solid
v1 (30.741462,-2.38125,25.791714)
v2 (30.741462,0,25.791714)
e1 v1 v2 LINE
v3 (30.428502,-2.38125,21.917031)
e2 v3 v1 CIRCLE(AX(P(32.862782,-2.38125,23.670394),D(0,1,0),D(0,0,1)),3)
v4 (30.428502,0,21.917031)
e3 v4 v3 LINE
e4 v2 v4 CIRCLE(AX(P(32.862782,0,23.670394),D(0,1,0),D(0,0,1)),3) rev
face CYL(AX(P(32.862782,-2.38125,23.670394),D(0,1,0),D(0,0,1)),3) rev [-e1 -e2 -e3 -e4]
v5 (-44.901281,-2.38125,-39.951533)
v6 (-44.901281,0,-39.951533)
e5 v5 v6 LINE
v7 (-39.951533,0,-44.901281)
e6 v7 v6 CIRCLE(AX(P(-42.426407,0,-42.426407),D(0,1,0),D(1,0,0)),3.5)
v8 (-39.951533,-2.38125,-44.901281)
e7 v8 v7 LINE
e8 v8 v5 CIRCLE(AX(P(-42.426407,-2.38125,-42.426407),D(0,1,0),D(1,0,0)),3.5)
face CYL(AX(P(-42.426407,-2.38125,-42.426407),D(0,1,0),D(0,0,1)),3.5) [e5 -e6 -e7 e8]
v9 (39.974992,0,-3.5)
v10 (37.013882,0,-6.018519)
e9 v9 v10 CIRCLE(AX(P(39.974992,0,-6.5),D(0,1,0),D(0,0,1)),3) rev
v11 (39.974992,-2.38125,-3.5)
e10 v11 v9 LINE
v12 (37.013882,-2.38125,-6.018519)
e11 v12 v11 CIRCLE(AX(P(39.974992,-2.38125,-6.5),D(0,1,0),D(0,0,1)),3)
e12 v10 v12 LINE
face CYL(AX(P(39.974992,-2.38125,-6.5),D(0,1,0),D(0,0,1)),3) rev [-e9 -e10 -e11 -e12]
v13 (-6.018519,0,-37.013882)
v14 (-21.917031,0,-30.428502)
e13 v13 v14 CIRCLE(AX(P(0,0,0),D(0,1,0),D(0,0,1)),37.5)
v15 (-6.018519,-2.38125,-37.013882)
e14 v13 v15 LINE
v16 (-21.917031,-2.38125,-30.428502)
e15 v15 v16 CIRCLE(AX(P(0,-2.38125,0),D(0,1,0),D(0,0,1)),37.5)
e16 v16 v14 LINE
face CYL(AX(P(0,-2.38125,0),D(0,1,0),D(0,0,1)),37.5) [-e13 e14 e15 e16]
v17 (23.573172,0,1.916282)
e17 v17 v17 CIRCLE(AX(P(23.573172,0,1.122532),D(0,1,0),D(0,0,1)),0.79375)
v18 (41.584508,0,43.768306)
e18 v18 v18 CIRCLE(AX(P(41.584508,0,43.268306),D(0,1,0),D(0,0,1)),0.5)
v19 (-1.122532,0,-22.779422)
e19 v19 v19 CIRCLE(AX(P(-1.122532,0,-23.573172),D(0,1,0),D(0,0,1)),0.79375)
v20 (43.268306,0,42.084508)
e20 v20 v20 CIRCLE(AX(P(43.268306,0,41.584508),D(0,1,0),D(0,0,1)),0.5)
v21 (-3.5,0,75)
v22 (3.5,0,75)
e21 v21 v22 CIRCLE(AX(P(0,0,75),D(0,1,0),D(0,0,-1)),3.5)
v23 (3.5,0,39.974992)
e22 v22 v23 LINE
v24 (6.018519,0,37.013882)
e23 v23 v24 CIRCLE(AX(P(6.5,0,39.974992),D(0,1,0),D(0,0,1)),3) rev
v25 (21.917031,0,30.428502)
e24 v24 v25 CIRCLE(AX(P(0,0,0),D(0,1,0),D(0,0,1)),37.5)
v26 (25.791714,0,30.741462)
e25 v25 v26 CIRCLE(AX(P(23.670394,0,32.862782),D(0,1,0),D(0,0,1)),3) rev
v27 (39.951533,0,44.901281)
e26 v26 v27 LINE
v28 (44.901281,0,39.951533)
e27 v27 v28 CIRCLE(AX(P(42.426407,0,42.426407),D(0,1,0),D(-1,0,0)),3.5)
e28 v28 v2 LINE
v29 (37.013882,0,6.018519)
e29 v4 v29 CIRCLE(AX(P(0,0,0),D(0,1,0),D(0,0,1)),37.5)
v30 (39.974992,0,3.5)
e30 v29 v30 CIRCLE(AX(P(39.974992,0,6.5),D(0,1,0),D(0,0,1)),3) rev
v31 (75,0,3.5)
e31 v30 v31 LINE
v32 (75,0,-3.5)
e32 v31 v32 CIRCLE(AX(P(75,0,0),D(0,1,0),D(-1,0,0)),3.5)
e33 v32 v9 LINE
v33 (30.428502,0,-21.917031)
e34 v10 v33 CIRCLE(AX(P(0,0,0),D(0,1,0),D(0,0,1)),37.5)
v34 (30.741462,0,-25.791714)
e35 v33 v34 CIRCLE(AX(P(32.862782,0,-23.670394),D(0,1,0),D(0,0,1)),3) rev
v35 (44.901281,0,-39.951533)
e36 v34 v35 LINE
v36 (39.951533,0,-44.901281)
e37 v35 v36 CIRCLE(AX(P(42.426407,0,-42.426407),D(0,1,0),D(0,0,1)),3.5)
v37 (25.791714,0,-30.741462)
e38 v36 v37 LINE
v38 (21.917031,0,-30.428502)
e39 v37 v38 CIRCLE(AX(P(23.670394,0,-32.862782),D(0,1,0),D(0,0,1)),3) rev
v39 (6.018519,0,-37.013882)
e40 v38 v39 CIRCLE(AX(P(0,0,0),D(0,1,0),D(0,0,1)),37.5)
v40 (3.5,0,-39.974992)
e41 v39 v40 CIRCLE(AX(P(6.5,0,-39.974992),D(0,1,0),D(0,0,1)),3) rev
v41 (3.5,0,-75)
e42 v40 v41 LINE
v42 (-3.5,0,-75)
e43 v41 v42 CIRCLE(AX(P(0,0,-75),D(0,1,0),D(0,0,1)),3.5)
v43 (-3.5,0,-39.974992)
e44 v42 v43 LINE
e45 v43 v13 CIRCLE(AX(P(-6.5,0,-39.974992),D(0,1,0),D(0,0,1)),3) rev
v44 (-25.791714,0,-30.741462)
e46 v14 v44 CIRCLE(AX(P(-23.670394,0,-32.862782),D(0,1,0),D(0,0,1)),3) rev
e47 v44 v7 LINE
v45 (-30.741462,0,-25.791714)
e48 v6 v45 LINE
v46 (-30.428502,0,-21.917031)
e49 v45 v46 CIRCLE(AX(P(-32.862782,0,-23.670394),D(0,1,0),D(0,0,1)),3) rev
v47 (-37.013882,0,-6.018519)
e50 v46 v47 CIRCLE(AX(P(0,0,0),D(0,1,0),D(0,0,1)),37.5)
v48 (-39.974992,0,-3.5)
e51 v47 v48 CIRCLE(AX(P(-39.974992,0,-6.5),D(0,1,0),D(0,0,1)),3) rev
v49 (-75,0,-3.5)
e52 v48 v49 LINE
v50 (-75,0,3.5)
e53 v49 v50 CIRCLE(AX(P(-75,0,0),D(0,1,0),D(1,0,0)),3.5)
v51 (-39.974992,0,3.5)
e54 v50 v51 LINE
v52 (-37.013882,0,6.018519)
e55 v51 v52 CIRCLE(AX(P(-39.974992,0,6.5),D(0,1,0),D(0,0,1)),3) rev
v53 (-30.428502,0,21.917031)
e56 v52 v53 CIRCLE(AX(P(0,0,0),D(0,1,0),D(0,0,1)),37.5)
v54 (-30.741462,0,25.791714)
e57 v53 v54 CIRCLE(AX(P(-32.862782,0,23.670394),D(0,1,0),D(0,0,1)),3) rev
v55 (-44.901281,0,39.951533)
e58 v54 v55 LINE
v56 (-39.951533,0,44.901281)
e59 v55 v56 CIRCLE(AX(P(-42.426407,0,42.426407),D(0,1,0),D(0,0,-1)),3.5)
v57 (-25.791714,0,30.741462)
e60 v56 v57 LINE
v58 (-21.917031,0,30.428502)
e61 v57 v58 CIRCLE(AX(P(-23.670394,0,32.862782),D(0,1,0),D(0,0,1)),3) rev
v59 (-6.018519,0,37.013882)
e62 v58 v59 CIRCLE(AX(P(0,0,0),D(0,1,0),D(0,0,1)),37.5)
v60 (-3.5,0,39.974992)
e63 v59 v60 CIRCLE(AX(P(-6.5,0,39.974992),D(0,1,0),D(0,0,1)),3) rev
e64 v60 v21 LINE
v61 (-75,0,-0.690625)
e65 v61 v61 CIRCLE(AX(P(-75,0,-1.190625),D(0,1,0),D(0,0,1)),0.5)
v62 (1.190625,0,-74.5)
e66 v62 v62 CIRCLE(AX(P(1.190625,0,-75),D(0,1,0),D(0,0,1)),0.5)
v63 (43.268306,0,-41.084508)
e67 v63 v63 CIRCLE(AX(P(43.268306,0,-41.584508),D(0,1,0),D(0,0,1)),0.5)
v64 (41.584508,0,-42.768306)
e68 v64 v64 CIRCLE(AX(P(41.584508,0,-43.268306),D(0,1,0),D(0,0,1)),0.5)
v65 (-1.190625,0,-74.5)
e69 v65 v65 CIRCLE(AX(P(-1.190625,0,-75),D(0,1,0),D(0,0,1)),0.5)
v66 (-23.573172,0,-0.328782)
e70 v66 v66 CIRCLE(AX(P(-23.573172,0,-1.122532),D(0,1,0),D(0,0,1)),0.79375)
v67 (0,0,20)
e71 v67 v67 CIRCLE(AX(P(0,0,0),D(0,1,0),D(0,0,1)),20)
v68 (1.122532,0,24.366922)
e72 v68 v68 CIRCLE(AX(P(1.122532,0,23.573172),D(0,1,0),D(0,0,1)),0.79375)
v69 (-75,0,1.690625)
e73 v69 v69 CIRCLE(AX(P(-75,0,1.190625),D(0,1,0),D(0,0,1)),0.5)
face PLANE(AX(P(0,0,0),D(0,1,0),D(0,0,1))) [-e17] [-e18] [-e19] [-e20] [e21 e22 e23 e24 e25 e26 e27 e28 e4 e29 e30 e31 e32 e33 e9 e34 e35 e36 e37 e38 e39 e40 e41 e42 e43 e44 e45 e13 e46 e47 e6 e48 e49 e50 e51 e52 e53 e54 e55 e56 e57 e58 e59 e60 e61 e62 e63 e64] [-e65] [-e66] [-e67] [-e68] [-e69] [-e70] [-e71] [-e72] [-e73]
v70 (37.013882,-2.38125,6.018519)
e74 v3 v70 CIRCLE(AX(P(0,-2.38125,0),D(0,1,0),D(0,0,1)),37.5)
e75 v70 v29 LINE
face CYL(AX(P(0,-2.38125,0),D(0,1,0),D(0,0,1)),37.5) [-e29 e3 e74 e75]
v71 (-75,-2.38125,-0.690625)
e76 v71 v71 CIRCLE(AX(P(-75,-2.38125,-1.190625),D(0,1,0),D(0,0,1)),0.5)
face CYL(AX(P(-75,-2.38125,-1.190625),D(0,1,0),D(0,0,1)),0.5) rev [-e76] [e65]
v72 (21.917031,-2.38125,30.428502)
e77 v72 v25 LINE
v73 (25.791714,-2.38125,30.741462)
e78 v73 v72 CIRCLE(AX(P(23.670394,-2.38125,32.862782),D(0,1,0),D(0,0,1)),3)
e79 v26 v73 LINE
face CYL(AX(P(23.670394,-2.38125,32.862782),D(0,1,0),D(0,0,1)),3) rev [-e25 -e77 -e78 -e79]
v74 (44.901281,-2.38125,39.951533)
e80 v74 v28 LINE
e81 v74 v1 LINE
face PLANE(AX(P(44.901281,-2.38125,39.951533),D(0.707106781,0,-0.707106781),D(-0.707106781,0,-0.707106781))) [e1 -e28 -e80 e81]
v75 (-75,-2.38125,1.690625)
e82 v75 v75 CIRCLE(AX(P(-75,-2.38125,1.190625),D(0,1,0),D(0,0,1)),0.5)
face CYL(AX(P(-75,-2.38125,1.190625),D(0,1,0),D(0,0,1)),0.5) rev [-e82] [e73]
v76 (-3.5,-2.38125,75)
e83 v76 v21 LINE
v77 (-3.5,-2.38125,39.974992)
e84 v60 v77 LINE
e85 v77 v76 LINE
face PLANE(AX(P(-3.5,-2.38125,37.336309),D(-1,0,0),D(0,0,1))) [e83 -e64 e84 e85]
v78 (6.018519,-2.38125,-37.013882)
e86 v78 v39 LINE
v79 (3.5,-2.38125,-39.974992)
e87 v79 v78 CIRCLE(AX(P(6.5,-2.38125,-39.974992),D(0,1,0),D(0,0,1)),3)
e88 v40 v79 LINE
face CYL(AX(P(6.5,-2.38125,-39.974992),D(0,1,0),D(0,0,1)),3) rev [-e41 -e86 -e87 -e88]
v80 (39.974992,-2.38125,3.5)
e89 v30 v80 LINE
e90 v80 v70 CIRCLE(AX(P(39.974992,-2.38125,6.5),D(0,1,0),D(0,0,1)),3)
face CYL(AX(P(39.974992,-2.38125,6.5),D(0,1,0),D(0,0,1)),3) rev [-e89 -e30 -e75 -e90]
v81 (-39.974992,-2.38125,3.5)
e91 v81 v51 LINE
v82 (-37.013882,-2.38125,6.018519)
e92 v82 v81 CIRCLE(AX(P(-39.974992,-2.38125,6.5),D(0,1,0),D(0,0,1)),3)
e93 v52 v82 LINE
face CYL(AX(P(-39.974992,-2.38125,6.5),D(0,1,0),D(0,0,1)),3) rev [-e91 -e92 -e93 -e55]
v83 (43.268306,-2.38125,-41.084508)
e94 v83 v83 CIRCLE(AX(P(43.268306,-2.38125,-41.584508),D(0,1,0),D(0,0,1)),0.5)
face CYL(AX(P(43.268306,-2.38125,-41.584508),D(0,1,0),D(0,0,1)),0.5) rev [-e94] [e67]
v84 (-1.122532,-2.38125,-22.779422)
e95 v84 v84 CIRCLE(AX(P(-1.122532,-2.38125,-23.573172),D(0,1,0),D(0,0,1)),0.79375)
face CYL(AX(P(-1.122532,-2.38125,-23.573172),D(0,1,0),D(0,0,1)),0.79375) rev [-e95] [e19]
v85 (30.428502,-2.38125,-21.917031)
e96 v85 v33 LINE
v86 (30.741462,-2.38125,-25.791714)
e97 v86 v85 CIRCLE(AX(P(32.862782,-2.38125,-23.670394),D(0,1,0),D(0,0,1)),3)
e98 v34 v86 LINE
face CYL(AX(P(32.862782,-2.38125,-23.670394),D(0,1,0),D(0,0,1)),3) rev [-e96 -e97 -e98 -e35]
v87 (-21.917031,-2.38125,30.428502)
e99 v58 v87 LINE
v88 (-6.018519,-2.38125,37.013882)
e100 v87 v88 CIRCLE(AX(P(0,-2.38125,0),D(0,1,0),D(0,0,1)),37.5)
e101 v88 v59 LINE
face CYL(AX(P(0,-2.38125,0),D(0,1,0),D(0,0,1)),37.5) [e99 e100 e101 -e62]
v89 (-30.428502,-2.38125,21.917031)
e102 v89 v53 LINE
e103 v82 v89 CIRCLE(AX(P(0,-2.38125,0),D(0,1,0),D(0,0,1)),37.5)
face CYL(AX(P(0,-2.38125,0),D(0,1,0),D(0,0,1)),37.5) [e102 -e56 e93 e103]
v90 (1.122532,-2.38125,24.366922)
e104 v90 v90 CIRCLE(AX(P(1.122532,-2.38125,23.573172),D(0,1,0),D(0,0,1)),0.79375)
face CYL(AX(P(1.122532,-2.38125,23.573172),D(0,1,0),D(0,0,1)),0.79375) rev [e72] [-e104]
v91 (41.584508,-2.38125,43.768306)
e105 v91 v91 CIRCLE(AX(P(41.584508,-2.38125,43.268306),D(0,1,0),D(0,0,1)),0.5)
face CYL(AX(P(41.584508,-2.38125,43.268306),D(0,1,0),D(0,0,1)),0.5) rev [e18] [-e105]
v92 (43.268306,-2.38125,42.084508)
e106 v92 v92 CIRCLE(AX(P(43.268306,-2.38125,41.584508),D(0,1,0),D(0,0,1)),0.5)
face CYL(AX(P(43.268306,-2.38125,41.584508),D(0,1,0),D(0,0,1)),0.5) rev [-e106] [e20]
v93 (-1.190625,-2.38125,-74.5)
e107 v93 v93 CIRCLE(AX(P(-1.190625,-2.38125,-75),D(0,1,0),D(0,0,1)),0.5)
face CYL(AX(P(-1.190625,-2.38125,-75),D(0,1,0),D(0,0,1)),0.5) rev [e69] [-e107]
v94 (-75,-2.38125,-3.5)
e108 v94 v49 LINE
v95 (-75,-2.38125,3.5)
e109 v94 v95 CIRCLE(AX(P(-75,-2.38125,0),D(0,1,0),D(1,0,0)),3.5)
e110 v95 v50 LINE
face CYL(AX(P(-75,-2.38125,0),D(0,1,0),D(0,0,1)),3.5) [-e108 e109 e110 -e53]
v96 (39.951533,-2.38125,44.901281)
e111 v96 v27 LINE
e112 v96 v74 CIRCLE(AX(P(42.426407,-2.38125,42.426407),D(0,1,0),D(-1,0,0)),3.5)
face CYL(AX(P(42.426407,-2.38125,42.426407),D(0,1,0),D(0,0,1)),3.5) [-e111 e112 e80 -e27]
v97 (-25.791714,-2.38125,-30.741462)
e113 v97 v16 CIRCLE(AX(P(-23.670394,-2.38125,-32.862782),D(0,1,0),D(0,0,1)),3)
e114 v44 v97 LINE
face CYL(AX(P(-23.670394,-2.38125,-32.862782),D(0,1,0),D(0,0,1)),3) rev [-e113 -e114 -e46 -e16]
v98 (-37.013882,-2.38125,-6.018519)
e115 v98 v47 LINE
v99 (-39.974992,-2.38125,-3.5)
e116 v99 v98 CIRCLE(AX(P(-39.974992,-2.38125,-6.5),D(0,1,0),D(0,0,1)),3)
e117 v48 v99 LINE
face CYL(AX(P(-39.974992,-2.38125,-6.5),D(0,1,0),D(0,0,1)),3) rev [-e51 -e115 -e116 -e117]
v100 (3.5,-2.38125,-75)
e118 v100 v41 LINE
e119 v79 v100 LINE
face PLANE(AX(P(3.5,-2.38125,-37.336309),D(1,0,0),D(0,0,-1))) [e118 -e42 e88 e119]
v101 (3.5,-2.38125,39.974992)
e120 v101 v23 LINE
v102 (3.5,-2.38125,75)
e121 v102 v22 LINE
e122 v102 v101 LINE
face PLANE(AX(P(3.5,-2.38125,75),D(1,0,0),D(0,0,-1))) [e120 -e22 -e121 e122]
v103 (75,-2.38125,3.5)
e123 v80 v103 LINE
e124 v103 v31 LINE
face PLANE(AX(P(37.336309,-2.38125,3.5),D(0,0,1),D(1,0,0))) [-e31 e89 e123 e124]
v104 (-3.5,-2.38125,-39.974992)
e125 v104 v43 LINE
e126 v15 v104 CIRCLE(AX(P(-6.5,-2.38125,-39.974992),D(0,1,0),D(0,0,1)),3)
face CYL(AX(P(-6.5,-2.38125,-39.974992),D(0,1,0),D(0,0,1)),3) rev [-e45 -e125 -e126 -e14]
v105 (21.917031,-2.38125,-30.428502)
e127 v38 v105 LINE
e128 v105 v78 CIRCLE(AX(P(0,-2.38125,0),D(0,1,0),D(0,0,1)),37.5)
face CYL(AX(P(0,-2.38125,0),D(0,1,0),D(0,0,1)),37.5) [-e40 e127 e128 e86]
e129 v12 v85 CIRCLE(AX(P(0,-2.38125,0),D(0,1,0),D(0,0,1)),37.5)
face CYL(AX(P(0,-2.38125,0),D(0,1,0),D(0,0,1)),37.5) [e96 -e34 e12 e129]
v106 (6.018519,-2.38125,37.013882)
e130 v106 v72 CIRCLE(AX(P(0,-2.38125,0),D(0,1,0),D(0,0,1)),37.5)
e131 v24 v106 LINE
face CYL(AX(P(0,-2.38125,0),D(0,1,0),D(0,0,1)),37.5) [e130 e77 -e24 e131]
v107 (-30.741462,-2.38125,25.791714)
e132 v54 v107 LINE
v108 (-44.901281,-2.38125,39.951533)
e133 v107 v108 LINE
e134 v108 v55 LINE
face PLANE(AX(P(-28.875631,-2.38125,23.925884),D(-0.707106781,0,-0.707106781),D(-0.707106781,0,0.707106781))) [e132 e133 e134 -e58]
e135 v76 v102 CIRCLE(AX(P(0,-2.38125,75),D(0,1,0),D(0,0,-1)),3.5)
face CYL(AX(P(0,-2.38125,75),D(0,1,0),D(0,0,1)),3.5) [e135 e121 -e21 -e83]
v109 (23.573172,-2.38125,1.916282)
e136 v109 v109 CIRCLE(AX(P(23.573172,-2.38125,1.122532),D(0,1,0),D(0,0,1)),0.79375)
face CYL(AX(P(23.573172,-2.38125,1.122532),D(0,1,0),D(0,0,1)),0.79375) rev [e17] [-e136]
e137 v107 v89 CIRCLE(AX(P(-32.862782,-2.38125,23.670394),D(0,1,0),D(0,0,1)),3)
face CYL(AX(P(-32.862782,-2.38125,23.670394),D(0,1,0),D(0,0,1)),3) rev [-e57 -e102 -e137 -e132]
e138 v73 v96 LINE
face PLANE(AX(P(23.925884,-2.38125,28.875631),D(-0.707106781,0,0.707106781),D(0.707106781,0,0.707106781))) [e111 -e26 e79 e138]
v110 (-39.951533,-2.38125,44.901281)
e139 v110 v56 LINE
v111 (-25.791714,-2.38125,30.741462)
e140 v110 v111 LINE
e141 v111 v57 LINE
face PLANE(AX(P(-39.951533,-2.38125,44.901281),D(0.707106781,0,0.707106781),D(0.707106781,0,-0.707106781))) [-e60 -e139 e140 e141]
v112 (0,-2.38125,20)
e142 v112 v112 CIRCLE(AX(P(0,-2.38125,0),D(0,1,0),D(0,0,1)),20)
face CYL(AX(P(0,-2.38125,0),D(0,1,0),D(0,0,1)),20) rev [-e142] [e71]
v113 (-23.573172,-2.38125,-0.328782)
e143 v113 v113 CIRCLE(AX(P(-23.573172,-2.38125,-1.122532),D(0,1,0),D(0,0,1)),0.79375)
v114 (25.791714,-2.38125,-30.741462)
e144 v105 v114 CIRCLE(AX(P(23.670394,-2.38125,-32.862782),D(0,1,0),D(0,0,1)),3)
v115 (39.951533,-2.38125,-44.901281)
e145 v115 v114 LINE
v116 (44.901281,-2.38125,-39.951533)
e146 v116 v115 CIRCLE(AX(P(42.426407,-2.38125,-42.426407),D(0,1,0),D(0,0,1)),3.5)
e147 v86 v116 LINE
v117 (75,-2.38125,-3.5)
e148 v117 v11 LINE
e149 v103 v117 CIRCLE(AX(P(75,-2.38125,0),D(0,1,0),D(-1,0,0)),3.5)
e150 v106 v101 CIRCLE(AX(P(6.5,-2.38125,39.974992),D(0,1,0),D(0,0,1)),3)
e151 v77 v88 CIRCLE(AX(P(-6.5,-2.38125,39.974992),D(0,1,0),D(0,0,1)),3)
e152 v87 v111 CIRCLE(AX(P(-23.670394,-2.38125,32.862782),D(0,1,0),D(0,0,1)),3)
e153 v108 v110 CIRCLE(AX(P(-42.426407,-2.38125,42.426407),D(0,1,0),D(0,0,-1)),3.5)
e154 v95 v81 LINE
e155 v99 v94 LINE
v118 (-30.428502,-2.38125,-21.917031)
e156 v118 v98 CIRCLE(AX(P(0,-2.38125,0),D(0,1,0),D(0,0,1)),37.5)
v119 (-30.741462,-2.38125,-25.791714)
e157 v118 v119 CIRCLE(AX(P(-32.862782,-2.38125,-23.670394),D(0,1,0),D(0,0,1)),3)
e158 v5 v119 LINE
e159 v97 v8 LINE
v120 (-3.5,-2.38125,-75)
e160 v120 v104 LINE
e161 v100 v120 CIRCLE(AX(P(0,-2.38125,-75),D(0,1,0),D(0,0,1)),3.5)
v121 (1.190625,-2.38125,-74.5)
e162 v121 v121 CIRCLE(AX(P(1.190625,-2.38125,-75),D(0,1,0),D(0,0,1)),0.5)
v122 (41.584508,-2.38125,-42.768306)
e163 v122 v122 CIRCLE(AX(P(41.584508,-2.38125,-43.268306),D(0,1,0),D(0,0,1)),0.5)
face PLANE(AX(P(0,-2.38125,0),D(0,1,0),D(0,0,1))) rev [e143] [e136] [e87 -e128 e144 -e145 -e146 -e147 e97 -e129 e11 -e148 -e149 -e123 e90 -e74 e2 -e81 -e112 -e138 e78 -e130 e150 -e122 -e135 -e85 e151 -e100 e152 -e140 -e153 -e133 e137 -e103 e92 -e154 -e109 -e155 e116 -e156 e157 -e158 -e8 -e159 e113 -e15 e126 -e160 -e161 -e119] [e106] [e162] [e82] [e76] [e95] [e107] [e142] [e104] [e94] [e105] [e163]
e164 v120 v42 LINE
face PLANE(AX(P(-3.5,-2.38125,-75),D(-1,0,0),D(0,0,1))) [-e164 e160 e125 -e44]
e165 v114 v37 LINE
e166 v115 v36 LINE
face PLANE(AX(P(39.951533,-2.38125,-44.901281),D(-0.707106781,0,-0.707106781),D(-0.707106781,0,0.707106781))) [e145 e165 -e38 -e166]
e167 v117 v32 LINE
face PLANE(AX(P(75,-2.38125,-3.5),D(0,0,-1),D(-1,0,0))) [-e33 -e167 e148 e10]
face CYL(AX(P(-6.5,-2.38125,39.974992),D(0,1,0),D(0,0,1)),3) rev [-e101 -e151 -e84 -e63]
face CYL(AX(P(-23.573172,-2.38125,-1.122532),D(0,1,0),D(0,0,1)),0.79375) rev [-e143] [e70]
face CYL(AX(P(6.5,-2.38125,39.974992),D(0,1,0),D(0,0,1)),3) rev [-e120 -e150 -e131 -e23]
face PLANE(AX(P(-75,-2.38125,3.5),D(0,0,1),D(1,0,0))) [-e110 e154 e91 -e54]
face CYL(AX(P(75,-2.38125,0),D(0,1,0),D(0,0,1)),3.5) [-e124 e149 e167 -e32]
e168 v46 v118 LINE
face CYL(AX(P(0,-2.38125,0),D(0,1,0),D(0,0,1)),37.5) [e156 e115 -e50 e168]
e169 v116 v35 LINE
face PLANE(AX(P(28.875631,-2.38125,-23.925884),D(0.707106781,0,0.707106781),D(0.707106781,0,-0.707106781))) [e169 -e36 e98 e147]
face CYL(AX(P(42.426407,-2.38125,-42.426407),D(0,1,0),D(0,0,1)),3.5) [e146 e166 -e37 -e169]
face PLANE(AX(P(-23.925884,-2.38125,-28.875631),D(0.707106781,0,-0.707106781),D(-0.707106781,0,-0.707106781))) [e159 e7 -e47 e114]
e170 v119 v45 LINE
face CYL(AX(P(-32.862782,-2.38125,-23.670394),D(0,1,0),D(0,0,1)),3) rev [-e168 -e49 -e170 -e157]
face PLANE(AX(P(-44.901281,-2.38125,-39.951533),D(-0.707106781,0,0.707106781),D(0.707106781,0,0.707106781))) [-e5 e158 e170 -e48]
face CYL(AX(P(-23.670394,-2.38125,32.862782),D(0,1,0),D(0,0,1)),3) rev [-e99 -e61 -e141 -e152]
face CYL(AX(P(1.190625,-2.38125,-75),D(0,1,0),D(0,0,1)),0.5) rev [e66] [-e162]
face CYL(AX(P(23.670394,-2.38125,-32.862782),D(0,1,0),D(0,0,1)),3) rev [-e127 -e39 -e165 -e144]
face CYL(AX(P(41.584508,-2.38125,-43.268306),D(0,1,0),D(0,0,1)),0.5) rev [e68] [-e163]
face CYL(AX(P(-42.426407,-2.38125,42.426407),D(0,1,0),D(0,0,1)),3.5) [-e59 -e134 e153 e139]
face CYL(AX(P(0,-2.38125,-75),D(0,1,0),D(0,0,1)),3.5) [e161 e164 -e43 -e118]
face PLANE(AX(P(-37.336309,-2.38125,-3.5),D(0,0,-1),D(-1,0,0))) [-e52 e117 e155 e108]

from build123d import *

# Parameters (mm, degrees)
SKETCH1_R                = 37.5
SKETCH1_R_2              = 20
BASE_FLANGE1_DEPTH       = 2.38125
BOSS_EXTRUDE1_DEPTH      = 2.38125
BOSS_EXTRUDE2_DEPTH      = 2.38125
FILLET1_R                = 3
CIRPATTERN1_COUNT        = 4
FILLET1_OF_CIRPATTERN1_R = 3
SKETCH7_R                = 0.5
CUT_EXTRUDE1_DEPTH       = 112.041300207
SKETCH10_R               = 0.79375
CUT_EXTRUDE2_DEPTH       = 112.041300207


# Sheet-metal steps are written as plain solids
with BuildPart() as part:
    # Sketch1 → Base-Flange1 (new body)
    with BuildSketch(Plane(origin=(0, 0, 0), x_dir=(1, 0, 0), z_dir=(0, 1, 0))):
        with Locations(Location((0, 0, 0), (0, 0, 270))):
            Circle(SKETCH1_R)
        with Locations(Location((0, 0, 0), (0, 0, 270))):
            Circle(SKETCH1_R_2, mode=Mode.SUBTRACT)
    extrude(amount=-BASE_FLANGE1_DEPTH)

    # Sketch6 → Boss-Extrude1 (add)
    with BuildSketch(Plane(origin=(0, 0, 0), x_dir=(1, 0, 0), z_dir=(0, 1, 0))):
        with BuildLine():
            Line((-3.5, 75), (-3.5, 37.336309405))
            Line((-3.5, 37.336309405), (3.5, 37.336309405))
            Line((3.5, 37.336309405), (3.5, 75))
            ThreePointArc((3.5, 75), (0, 78.5), (-3.5, 75))
        make_face()
    boss_extrude1 = extrude(amount=-BOSS_EXTRUDE1_DEPTH)

    # Sketch9 → Boss-Extrude2 (add)
    with BuildSketch(Plane(origin=(0, 0, 0), x_dir=(1, 0, 0), z_dir=(0, 1, 0))):
        with BuildLine():
            Line((23.925883831, 28.875631299), (28.875631299, 23.925883831))
            Line((28.875631299, 23.925883831), (44.901280605, 39.951533137))
            ThreePointArc((44.901280605, 39.951533137), (44.901280605, 44.901280605), (39.951533137, 44.901280605))
            Line((39.951533137, 44.901280605), (23.925883831, 28.875631299))
        make_face()
    boss_extrude2 = extrude(amount=-BOSS_EXTRUDE2_DEPTH)

    # Fillet1
    fillet1_edges = [part.edges().sort_by_distance(p)[0] for p in [
        (3.5, -1.190625, -37.336309405),
        (-3.5, -1.190625, -37.336309405),
        (23.925883831, -1.190625, -28.875631299),
        (28.875631299, -1.190625, -23.925883831),
    ]]
    fillet(fillet1_edges, radius=FILLET1_R)

    # CirPattern1: Boss-Extrude1, Boss-Extrude2 ×4 about axis
    cirpattern1_axis = Axis((0, 0, 0), (0, 1, 0))
    add([boss_extrude1.rotate(cirpattern1_axis, i * 360 / CIRPATTERN1_COUNT) for i in range(1, CIRPATTERN1_COUNT)])
    add([boss_extrude2.rotate(cirpattern1_axis, i * 360 / CIRPATTERN1_COUNT) for i in range(1, CIRPATTERN1_COUNT)])

    # Fillet1 of CirPattern1
    fillet1_of_cirpattern1_edges = [part.edges().sort_by_distance(p)[0] for p in [
        (-37.336309405, -1.190625, -3.5),
        (-37.336309405, -1.190625, 3.5),
        (-28.875631299, -1.190625, -23.925883831),
        (-23.925883831, -1.190625, -28.875631299),
        (-3.5, -1.190625, 37.336309405),
        (3.5, -1.190625, 37.336309405),
        (-23.925883831, -1.190625, 28.875631299),
        (-28.875631299, -1.190625, 23.925883831),
        (37.336309405, -1.190625, 3.5),
        (37.336309405, -1.190625, -3.5),
        (28.875631299, -1.190625, 23.925883831),
        (23.925883831, -1.190625, 28.875631299),
    ]]
    fillet(fillet1_of_cirpattern1_edges, radius=FILLET1_OF_CIRPATTERN1_R)

    # Sketch7 → Cut-Extrude1 (cut, through all)
    with BuildSketch(Plane(origin=(0, 0, 0), x_dir=(1, 0, 0), z_dir=(0, 1, 0))):
        with Locations(Location((-1.190625, 75, 0), (0, 0, 270))):
            Circle(SKETCH7_R)
        with Locations(Location((1.190625, 75, 0), (0, 0, 270))):
            Circle(SKETCH7_R)
        with Locations(Location((41.58450786, 43.268305883, 0), (0, 0, 270))):
            Circle(SKETCH7_R)
        with Locations(Location((43.268305883, 41.58450786, 0), (0, 0, 270))):
            Circle(SKETCH7_R)
        with Locations(Location((-75, -1.190625, 0), (0, 0, 270))):
            Circle(SKETCH7_R)
        with Locations(Location((-75, 1.190625, 0), (0, 0, 270))):
            Circle(SKETCH7_R)
        with Locations(Location((43.268305883, -41.58450786, 0), (0, 0, 270))):
            Circle(SKETCH7_R)
        with Locations(Location((41.58450786, -43.268305883, 0), (0, 0, 270))):
            Circle(SKETCH7_R)
    extrude(amount=-CUT_EXTRUDE1_DEPTH, mode=Mode.SUBTRACT)

    # Sketch10 → Cut-Extrude2 (cut, through all)
    with BuildSketch(Plane(origin=(0, 0, 0), x_dir=(1, 0, 0), z_dir=(0, 1, 0))):
        with Locations(Location((-23.573172318, 1.122532015, 0), (0, 0, 270))):
            Circle(SKETCH10_R)
        with Locations(Location((-1.122532015, 23.573172318, 0), (0, 0, 270))):
            Circle(SKETCH10_R)
        with Locations(Location((23.573172318, -1.122532015, 0), (0, 0, 270))):
            Circle(SKETCH10_R)
        with Locations(Location((1.122532015, -23.573172318, 0), (0, 0, 270))):
            Circle(SKETCH10_R)
    extrude(amount=-CUT_EXTRUDE2_DEPTH, mode=Mode.SUBTRACT)


solid = part.part
